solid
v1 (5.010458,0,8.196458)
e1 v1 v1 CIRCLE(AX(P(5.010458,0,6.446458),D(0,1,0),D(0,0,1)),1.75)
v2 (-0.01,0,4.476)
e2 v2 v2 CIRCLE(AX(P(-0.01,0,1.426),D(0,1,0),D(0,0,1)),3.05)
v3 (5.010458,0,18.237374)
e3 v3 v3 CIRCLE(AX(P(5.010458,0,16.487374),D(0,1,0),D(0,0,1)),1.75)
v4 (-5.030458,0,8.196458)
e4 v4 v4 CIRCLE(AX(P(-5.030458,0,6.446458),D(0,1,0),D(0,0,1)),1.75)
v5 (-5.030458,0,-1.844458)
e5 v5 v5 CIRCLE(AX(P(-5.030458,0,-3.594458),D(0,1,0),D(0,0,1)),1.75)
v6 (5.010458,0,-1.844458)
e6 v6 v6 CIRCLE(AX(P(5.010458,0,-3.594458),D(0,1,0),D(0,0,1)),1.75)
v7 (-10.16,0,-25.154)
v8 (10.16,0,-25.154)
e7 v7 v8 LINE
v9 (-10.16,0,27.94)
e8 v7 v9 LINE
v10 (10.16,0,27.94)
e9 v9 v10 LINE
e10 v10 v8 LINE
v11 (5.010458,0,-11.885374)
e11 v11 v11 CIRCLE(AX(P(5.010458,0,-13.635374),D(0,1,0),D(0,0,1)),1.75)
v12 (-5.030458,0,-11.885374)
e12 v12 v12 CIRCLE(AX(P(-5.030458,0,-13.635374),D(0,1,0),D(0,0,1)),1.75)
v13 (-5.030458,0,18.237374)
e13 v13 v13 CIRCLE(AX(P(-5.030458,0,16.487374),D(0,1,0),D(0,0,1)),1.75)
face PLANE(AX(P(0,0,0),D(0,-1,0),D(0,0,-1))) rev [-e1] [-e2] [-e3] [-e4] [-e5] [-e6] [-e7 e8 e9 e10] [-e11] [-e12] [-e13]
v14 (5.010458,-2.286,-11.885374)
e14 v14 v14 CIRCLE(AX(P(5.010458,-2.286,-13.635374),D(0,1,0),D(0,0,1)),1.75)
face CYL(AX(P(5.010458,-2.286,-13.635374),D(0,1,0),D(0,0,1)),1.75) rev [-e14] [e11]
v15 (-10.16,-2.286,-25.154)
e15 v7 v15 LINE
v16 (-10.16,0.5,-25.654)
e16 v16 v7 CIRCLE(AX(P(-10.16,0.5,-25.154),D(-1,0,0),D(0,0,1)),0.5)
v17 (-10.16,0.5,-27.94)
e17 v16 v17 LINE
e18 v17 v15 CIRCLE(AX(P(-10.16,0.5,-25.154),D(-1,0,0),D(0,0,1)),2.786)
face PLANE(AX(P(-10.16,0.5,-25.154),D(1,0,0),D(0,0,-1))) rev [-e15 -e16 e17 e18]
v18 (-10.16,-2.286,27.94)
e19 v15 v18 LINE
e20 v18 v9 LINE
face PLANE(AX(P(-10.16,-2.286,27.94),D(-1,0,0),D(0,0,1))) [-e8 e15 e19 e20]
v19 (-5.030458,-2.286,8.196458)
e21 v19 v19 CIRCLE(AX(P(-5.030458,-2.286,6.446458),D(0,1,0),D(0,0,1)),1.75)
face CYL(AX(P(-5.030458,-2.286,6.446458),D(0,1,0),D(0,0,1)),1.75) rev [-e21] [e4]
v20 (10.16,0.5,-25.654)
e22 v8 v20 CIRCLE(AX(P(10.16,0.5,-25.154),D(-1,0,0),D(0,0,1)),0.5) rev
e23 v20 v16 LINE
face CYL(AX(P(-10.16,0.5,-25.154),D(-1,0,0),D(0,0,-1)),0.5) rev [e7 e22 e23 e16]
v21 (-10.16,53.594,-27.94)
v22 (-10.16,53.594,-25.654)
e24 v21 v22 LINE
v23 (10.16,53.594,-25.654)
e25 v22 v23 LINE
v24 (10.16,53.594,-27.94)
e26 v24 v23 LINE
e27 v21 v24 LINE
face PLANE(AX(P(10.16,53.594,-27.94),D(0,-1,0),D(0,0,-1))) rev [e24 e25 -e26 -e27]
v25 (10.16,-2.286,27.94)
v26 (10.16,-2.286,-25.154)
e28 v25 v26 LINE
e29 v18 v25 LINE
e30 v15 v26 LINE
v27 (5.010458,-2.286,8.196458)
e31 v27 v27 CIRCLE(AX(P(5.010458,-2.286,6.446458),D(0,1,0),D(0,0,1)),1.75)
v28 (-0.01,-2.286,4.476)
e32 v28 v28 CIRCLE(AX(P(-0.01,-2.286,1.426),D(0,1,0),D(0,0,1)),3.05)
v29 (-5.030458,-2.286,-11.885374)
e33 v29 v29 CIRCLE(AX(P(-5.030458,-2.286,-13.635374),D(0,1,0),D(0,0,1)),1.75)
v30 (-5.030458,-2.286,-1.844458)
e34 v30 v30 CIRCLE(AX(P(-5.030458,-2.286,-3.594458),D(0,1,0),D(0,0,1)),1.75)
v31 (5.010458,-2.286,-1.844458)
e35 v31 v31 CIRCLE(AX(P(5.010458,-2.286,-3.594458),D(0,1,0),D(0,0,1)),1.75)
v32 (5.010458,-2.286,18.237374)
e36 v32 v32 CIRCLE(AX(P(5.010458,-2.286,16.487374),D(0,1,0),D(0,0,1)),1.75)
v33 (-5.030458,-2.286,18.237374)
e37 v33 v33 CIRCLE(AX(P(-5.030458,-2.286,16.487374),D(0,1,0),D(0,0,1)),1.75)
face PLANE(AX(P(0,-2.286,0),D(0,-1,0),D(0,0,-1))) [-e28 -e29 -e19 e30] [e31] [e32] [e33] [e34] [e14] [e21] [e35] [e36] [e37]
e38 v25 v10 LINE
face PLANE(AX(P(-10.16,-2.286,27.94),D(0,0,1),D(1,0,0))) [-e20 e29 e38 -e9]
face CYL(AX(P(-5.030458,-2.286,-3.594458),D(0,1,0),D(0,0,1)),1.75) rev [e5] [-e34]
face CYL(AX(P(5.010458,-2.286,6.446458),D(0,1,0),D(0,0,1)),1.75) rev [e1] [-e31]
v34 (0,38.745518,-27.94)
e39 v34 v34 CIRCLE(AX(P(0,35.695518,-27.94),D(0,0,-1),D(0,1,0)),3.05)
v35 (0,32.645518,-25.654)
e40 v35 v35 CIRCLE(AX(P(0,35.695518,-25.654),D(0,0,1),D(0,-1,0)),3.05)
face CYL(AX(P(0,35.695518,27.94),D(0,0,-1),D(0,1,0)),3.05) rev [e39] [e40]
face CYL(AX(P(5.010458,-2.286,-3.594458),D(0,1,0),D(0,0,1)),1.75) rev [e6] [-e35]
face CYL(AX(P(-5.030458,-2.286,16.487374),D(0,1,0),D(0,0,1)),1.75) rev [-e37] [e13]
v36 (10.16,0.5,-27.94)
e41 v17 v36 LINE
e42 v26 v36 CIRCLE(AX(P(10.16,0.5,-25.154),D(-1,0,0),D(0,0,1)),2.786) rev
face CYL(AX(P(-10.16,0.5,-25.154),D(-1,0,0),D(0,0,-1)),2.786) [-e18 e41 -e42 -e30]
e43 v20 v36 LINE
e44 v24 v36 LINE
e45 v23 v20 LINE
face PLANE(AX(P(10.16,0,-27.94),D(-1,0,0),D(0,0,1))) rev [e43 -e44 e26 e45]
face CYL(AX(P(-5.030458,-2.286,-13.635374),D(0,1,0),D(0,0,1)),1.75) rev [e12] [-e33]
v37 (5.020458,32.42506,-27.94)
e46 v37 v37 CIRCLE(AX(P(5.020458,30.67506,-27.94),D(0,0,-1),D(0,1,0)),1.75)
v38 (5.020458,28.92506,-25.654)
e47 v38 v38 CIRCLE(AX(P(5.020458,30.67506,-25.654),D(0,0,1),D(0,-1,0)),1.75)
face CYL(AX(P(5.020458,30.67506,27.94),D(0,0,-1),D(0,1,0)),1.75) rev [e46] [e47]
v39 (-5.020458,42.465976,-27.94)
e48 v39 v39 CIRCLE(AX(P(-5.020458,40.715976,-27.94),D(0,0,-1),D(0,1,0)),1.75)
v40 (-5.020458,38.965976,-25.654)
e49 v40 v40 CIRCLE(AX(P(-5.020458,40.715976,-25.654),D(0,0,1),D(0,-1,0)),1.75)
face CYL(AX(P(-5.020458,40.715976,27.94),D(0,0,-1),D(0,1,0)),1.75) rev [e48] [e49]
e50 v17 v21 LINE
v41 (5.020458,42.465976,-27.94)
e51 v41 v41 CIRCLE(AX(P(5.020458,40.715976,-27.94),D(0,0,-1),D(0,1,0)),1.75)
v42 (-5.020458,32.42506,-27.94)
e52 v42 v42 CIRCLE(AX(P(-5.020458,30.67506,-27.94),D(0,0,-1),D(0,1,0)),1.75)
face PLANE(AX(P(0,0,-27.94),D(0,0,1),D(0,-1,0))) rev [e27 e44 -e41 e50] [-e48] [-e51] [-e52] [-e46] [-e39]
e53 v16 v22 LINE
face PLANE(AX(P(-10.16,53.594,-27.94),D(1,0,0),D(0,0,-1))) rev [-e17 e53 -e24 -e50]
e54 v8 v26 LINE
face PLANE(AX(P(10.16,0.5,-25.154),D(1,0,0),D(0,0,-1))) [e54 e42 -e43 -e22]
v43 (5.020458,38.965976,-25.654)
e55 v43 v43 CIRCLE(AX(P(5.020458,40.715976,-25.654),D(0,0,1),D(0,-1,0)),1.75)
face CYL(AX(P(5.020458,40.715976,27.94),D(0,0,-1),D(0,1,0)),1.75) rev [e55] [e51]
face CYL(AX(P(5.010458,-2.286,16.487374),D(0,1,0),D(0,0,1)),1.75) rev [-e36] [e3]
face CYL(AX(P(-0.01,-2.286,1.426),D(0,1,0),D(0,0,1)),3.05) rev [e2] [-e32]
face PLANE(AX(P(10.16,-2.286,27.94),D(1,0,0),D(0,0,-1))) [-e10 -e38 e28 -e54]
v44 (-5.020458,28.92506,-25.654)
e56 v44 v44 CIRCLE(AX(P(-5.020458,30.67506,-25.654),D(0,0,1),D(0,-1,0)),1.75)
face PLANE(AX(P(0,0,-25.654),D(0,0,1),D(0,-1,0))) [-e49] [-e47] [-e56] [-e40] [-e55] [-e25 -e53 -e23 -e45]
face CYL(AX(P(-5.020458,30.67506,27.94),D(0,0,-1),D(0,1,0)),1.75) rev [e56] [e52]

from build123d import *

# Parameters (mm, degrees)
SKETCH1_W                    = 20.32
SKETCH1_H                    = 55.88
BASE_FLANGE1_DEPTH           = 2.286
EDGE_FLANGE1_STRIP_W         = 10.144
EDGE_FLANGE1_STRIP_H         = 2.286
EDGE_FLANGE1_STRIP_CUT_DEPTH = 20.32
EDGE_FLANGE1_DEPTH           = 20.32
SKETCH9_R                    = 3.05
CUT_EXTRUDE1_DEPTH           = 79.090440106
SKETCH10_R                   = 3.05
SKETCH10_R_2                 = 1.75
CUT_EXTRUDE2_DEPTH           = 62.287731529


# Sheet-metal steps are written as plain solids
with BuildPart() as part:
    # Sketch1 → Base-Flange1 (new body)
    with BuildSketch(Plane(origin=(0, 0, 0), x_dir=(1, 0, 0), z_dir=(0, 1, 0))):
        Rectangle(SKETCH1_W, SKETCH1_H)
    extrude(amount=-BASE_FLANGE1_DEPTH)

    # Edge-Flange1 strip (across the edge) → Edge-Flange1 strip cut (cut)
    with BuildSketch(Plane(origin=(10.16, 0, -27.94), x_dir=(0, 0, 1), z_dir=(-1, 0, 0))):
        with Locations((-2.286, -1.143)):
            Rectangle(EDGE_FLANGE1_STRIP_W, EDGE_FLANGE1_STRIP_H)
    extrude(amount=EDGE_FLANGE1_STRIP_CUT_DEPTH, mode=Mode.SUBTRACT)

    # Edge-Flange1 section (across the edge) → Edge-Flange1 (add)
    with BuildSketch(Plane(origin=(10.16, 0, -27.94), x_dir=(0, 0, 1), z_dir=(-1, 0, 0))):
        with BuildLine():
            Line((0, 0.5), (0, 53.594))
            Line((0, 53.594), (2.286, 53.594))
            Line((2.286, 53.594), (2.286, 0.5))
            ThreePointArc((2.286, 0.5), (2.432446609, 0.146446609), (2.786, 0))
            Line((2.786, 0), (2.786, -2.286))
            ThreePointArc((2.786, -2.286), (0.816000508, -1.469999492), (0, 0.5))
        make_face()
    extrude(amount=EDGE_FLANGE1_DEPTH)

    # Sketch9 → Cut-Extrude1 (cut, through all)
    with BuildSketch(Plane(origin=(0, 0, -27.94), x_dir=(-1, 0, 0), z_dir=(0, 0, -1))):
        with Locations(Location((0, 35.695518005, 0), (0, 0, 90))):
            Circle(SKETCH9_R)
        with BuildLine():
            ThreePointArc((-5.020458146, 42.465976152), (-6.770458146, 40.715976152), (-5.020458146, 38.965976152))
            ThreePointArc((-5.020458146, 38.965976152), (-3.270458146, 40.715976152), (-5.020458146, 42.465976152))
        make_face()
        with BuildLine():
            ThreePointArc((-5.020458146, 32.425059859), (-6.770458146, 30.675059859), (-5.020458146, 28.925059859))
            ThreePointArc((-5.020458146, 28.925059859), (-3.270458146, 30.675059859), (-5.020458146, 32.425059859))
        make_face()
        with BuildLine():
            ThreePointArc((5.020458146, 32.425059859), (3.270458146, 30.675059859), (5.020458146, 28.925059859))
            ThreePointArc((5.020458146, 28.925059859), (6.770458146, 30.675059859), (5.020458146, 32.425059859))
        make_face()
        with BuildLine():
            ThreePointArc((5.020458146, 42.465976152), (3.270458146, 40.715976152), (5.020458146, 38.965976152))
            ThreePointArc((5.020458146, 38.965976152), (6.770458146, 40.715976152), (5.020458146, 42.465976152))
        make_face()
    extrude(amount=-CUT_EXTRUDE1_DEPTH, mode=Mode.SUBTRACT)

    # Sketch10 → Cut-Extrude2 (cut, through all)
    with BuildSketch(Plane(origin=(0, 0, 0), x_dir=(1, 0, 0), z_dir=(0, 1, 0))):
        with Locations(Location((-0.01000002, -1.426000002, 0), (0, 0, 270))):
            Circle(SKETCH10_R)
        with Locations(Location((-5.030458167, -16.487374441, 0), (0, 0, 270))):
            Circle(SKETCH10_R_2)
        with Locations(Location((-5.030458167, 3.594458144, 0), (0, 0, 270))):
            Circle(SKETCH10_R_2)
        with Locations(Location((5.010458126, 13.635374437, 0), (0, 0, 270))):
            Circle(SKETCH10_R_2)
        with Locations(Location((5.010458126, -6.446458149, 0), (0, 0, 270))):
            Circle(SKETCH10_R_2)
        with Locations(Location((5.010458126, -16.487374441, 0), (0, 0, 270))):
            Circle(SKETCH10_R_2)
        with Locations(Location((-5.030458167, 13.635374437, 0), (0, 0, 270))):
            Circle(SKETCH10_R_2)
        with Locations(Location((-5.030458167, -6.446458149, 0), (0, 0, 270))):
            Circle(SKETCH10_R_2)
        with Locations(Location((5.010458126, 3.594458144, 0), (0, 0, 270))):
            Circle(SKETCH10_R_2)
    extrude(amount=-CUT_EXTRUDE2_DEPTH, mode=Mode.SUBTRACT)


solid = part.part
